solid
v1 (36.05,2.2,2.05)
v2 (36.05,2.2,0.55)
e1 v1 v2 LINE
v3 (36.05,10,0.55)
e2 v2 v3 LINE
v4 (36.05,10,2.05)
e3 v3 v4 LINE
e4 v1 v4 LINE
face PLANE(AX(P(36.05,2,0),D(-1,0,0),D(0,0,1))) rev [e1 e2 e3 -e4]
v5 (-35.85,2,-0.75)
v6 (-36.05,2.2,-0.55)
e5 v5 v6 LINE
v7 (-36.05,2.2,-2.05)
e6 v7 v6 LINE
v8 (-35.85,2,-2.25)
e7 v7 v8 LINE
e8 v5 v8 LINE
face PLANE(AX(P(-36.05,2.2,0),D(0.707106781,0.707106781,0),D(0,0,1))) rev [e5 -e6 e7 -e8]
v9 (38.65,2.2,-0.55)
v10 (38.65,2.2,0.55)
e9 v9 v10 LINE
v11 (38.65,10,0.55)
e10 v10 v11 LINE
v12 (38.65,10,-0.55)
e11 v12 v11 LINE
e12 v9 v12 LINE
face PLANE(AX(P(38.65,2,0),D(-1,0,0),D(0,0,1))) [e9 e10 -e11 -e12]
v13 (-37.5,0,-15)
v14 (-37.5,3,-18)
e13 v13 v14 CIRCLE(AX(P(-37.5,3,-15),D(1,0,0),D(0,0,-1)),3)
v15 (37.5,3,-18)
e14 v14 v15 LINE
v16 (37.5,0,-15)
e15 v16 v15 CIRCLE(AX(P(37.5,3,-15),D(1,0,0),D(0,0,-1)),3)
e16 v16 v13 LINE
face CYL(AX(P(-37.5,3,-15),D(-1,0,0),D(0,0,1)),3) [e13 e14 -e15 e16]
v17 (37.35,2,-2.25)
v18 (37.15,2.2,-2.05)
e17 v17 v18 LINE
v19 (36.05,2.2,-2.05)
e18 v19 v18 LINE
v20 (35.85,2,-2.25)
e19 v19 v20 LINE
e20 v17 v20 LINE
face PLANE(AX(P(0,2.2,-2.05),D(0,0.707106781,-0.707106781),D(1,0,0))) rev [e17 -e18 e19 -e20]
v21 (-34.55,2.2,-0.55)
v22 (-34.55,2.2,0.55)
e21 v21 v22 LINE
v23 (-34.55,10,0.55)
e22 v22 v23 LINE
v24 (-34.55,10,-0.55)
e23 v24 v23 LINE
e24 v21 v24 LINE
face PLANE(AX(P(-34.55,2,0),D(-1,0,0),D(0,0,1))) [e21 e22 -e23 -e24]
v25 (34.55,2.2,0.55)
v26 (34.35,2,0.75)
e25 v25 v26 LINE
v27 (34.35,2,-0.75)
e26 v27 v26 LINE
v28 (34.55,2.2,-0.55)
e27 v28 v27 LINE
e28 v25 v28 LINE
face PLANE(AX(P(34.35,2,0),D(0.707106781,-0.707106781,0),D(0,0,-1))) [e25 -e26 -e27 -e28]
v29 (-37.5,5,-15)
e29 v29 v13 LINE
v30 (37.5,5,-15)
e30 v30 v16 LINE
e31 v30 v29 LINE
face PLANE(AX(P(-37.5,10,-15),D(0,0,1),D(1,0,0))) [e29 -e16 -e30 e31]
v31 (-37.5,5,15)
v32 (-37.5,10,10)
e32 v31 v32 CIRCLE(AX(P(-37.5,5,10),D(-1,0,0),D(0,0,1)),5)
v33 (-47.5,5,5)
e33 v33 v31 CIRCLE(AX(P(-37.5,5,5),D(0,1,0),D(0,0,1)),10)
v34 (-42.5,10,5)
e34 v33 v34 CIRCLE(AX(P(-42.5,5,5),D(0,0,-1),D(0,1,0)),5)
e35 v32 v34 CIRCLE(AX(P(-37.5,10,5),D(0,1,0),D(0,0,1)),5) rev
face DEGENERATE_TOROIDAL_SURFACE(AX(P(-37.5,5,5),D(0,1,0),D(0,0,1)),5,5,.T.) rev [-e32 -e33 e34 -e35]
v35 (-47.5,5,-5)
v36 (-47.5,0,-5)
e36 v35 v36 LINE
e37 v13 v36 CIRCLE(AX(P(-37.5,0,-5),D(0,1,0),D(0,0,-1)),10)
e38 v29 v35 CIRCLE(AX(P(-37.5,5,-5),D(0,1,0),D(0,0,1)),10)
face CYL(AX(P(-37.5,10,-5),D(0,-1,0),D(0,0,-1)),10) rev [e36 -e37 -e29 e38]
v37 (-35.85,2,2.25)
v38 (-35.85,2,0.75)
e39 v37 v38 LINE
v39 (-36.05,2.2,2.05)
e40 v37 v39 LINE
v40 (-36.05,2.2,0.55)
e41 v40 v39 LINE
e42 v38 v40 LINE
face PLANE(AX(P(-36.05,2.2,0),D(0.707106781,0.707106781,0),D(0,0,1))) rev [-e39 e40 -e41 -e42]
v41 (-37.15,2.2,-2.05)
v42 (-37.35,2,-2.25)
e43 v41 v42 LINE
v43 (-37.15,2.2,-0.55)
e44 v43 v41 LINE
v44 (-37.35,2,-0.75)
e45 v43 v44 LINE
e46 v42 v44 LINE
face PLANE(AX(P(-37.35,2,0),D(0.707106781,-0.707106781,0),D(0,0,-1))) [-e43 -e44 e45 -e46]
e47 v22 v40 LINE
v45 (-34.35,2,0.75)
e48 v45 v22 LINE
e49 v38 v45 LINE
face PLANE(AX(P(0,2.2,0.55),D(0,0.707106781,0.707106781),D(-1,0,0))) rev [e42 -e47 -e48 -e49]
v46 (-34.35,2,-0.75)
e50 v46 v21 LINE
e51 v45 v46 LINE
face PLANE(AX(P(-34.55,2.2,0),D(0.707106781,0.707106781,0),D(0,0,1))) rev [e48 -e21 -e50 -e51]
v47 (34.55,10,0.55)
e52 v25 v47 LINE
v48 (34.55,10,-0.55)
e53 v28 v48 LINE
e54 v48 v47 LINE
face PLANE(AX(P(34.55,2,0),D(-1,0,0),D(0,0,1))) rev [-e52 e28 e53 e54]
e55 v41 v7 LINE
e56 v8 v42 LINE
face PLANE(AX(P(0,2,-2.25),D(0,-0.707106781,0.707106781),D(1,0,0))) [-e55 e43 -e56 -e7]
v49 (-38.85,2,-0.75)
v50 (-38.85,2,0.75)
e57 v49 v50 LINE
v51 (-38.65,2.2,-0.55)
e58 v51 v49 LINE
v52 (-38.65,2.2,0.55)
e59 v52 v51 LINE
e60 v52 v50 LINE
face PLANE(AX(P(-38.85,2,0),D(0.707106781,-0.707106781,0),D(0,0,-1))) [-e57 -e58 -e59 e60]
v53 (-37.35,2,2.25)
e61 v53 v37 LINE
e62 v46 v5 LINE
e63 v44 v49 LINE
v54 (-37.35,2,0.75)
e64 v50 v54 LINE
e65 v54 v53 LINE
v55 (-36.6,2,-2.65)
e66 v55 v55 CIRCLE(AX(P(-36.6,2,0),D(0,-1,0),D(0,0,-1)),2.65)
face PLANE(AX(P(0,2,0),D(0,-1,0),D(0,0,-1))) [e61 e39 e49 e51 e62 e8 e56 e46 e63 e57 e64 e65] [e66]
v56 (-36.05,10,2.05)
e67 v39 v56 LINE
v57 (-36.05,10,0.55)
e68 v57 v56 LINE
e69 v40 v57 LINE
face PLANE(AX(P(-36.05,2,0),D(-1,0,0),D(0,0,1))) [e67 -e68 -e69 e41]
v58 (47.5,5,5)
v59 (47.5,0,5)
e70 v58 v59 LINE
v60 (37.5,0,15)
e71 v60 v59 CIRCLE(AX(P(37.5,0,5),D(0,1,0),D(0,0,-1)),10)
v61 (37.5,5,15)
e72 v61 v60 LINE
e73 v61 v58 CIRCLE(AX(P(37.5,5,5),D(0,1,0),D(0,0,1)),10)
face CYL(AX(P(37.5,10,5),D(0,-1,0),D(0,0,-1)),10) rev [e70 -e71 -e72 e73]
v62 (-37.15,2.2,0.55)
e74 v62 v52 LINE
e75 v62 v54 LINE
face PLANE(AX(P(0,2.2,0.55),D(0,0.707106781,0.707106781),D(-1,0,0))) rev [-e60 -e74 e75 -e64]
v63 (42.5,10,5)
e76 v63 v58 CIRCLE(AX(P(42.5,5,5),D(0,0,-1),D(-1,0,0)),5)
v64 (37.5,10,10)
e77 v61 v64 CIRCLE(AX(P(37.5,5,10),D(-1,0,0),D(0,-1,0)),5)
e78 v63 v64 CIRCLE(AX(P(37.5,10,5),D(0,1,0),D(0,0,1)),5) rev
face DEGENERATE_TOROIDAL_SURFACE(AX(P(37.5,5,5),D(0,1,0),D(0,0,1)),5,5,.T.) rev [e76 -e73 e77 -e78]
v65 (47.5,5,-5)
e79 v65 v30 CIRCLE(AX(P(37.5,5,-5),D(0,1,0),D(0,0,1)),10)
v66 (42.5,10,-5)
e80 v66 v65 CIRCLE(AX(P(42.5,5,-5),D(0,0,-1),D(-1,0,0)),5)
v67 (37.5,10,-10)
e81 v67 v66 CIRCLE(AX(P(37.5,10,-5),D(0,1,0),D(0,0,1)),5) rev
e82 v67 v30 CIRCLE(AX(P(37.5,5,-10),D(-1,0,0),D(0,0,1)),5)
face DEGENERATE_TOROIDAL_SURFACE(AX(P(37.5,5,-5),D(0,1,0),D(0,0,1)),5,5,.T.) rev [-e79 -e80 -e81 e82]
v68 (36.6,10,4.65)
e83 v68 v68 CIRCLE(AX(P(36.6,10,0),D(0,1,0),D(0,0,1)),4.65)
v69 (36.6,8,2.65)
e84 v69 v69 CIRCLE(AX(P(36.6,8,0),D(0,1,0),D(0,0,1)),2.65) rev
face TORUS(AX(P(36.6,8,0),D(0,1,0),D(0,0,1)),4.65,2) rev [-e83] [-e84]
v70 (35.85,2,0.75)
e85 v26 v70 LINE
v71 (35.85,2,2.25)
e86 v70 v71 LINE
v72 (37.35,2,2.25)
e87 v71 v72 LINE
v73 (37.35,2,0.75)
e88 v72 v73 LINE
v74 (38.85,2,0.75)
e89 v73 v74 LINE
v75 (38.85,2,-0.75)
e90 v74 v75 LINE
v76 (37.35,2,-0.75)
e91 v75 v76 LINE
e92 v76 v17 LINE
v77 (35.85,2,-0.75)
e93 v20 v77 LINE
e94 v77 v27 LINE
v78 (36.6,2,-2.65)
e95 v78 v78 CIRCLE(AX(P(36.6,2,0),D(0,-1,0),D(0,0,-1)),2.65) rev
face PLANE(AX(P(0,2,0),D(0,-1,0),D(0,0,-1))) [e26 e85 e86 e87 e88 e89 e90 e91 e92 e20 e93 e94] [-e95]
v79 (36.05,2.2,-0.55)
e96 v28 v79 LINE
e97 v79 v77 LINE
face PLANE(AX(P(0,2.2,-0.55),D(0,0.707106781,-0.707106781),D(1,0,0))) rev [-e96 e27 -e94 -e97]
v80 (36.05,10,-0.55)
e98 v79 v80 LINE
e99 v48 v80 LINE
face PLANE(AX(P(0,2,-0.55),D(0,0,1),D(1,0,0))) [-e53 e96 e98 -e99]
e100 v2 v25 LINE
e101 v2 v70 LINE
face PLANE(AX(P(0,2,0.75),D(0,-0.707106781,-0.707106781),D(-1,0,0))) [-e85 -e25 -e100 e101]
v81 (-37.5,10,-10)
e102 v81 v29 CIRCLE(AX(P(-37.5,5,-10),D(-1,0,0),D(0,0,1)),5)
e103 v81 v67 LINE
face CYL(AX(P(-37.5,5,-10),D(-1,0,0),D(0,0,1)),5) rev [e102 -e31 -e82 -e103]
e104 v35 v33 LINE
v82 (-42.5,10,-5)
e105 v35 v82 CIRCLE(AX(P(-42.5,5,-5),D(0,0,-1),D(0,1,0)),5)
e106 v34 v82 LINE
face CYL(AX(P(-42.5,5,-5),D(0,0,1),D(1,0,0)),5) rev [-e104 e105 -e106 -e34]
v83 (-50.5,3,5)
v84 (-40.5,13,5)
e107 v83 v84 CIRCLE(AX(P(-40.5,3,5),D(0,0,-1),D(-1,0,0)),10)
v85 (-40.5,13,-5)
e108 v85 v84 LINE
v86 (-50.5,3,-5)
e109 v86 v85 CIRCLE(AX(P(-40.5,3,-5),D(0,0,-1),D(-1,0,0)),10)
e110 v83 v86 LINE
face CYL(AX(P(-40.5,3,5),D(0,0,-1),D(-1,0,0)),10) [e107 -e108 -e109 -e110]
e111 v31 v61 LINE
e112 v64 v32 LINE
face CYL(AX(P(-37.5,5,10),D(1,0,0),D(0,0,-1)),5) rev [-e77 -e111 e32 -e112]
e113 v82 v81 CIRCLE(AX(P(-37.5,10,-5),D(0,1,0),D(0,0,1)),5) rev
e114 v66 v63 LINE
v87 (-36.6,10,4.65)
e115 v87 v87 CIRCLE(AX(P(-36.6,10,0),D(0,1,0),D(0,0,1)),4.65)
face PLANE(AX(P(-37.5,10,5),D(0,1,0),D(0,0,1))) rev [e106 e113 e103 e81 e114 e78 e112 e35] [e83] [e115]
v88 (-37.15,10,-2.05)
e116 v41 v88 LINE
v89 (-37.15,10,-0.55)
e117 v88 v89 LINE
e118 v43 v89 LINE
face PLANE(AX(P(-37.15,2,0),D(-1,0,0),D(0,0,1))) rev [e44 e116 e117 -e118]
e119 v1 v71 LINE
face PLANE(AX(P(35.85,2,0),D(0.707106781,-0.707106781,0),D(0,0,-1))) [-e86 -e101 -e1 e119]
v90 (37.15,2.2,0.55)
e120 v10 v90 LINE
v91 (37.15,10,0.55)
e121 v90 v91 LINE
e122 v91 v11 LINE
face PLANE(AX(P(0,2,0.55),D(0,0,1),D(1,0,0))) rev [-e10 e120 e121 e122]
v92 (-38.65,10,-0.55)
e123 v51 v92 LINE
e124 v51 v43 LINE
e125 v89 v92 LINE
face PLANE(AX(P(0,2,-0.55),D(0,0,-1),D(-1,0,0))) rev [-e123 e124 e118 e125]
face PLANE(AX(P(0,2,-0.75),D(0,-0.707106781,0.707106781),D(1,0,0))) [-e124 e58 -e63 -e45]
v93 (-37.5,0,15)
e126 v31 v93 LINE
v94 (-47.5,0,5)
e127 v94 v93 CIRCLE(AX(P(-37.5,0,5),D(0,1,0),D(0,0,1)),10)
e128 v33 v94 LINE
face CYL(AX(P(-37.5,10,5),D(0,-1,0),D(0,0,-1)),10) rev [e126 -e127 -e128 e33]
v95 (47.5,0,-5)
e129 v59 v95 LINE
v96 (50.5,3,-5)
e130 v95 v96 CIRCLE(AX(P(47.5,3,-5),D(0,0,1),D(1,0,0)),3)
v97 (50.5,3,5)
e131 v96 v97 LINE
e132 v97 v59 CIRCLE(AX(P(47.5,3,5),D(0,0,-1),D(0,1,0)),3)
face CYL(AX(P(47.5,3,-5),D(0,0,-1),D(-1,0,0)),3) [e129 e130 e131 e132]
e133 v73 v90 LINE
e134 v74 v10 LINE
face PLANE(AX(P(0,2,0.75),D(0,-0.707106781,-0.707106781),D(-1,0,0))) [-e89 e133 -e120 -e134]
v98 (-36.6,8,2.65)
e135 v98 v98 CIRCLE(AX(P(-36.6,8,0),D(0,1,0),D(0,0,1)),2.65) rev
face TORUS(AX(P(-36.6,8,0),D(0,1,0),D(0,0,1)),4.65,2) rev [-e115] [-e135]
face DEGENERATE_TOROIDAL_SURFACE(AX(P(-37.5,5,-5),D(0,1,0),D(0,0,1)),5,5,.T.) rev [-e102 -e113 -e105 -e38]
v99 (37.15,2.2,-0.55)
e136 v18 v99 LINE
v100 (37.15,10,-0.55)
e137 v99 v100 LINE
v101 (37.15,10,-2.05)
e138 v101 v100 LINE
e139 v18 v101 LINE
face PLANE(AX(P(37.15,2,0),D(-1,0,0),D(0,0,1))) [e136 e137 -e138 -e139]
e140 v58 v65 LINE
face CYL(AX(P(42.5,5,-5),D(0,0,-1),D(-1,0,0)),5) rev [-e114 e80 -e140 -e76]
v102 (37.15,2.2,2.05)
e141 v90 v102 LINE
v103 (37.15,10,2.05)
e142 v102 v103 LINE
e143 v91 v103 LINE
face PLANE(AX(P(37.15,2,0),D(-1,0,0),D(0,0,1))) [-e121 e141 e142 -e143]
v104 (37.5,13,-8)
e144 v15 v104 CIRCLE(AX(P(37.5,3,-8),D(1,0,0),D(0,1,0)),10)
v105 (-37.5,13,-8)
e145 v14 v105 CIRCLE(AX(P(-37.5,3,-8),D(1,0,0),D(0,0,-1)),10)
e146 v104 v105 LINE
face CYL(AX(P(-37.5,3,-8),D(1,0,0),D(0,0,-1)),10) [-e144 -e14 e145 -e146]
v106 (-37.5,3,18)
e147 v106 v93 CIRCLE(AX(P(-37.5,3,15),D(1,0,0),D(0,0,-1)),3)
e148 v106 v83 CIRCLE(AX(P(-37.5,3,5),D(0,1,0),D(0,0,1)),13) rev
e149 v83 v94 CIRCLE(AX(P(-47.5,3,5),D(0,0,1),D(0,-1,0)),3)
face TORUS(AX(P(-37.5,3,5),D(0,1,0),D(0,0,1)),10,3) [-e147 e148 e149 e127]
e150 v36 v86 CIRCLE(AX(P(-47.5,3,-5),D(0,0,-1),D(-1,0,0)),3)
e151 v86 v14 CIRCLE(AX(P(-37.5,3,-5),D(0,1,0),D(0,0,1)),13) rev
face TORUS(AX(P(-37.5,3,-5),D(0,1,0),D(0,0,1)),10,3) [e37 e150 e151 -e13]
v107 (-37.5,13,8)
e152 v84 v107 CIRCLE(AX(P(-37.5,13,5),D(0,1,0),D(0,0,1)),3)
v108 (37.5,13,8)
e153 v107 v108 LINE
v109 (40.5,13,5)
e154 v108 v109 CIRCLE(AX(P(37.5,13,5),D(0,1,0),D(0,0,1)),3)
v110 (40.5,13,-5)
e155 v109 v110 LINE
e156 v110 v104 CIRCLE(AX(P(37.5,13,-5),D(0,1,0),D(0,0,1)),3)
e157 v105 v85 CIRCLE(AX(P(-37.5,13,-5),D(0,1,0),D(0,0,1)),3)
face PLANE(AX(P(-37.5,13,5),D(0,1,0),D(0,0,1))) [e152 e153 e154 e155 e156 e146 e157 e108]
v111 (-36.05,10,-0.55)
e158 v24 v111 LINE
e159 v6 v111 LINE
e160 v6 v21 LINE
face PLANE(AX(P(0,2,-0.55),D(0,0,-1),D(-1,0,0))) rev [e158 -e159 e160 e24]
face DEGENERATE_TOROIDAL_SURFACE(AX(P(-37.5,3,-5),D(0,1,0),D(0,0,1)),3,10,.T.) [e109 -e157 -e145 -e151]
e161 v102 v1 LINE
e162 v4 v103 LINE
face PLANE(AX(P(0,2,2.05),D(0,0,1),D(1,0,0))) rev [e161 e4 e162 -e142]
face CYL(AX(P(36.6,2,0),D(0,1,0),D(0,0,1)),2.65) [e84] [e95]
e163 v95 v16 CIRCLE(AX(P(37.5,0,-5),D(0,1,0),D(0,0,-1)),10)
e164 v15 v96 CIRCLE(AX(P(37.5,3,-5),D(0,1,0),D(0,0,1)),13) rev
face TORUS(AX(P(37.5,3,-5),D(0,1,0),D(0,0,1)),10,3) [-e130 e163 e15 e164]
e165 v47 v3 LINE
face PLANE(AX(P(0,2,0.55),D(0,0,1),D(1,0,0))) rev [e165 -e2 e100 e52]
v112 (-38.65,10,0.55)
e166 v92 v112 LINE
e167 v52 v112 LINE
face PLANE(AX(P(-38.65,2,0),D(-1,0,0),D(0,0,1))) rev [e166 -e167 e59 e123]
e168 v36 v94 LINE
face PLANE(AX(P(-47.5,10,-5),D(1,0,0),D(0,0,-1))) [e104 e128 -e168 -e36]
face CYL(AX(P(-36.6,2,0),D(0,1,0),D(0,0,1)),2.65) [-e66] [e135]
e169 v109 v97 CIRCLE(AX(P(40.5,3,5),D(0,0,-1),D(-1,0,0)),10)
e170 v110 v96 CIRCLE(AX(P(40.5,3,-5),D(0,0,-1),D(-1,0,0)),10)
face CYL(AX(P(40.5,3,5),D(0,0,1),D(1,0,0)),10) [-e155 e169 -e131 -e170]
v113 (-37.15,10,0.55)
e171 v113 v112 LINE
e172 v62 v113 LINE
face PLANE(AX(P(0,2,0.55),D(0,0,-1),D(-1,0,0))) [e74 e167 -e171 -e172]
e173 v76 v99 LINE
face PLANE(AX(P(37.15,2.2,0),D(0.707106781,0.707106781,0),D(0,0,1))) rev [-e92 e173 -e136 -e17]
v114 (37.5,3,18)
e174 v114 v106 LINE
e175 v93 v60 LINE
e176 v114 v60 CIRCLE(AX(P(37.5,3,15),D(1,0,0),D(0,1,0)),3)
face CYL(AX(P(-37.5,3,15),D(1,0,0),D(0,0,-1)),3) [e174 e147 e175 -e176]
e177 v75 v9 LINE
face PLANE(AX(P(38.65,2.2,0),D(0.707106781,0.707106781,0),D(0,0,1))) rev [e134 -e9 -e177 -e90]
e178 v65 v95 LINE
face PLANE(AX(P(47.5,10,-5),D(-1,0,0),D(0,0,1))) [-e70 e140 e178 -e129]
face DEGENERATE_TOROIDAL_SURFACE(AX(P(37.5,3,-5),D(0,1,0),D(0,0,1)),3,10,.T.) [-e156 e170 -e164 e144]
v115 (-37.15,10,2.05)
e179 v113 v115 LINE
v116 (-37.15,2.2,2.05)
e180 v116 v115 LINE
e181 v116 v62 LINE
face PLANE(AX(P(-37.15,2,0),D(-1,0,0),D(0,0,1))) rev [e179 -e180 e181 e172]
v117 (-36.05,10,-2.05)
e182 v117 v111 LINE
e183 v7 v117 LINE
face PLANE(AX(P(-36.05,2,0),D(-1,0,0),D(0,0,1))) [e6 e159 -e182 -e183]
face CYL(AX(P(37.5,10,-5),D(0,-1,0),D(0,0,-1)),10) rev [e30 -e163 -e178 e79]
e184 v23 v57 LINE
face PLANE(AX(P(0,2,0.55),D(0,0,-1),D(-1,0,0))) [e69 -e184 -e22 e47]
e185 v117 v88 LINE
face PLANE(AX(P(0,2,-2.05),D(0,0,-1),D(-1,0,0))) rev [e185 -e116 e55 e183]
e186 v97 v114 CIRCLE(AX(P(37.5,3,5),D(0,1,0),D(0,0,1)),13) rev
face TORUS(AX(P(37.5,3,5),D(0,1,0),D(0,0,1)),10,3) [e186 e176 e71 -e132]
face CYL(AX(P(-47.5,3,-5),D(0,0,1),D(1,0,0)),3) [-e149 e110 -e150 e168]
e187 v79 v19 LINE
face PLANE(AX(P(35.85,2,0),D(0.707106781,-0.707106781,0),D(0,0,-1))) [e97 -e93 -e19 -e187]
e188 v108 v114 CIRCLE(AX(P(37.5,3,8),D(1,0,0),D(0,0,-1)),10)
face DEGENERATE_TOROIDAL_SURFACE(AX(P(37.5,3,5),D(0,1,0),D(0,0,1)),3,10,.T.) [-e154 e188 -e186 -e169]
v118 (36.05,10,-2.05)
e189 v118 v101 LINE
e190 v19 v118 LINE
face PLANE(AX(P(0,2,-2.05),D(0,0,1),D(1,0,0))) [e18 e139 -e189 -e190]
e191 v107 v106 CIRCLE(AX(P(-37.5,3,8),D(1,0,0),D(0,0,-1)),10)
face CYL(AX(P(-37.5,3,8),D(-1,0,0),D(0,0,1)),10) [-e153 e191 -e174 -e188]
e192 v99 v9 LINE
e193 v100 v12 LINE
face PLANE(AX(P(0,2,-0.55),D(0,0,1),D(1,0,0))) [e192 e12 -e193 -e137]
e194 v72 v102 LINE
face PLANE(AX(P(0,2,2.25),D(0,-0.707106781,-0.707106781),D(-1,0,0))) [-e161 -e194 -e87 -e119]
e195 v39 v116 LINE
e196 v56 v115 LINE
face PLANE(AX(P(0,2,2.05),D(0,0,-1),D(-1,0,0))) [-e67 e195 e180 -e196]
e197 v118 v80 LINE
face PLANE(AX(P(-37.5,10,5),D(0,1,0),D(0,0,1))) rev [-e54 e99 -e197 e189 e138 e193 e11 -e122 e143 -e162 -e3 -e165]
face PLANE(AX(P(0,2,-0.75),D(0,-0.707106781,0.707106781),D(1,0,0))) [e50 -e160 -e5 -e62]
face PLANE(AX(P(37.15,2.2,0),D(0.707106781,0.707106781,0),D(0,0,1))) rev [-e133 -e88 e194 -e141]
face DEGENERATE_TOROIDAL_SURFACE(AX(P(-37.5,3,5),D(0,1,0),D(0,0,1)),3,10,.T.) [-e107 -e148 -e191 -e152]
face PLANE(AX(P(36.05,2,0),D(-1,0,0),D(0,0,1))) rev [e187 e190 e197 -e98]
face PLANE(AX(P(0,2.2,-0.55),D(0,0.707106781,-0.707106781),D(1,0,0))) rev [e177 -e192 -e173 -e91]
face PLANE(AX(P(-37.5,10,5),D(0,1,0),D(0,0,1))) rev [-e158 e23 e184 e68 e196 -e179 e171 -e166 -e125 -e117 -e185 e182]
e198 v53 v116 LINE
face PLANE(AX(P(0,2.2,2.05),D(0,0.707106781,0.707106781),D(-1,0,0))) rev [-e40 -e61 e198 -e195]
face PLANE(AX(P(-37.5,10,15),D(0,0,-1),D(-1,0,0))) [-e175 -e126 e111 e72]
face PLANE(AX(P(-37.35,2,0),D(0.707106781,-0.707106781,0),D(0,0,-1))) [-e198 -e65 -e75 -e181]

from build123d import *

# Parameters (mm, degrees)
EXTRUDE_1_DEPTH = 10
SHELL_2_T       = 3
FILLET_3_R      = 10
FILLET_4_R      = 3
SKETCH_2_R      = 2.65
EXTRUDE_2_DEPTH = 8
FILLET_7_R      = 5
CHAMFER_1_SIZE  = 0.2
CHAMFER_2_SIZE  = 0.2
FILLET_9_R      = 2
FILLET_10_R     = 2


# Some blends are built 0.0001 mm under size
with BuildPart() as part:
    # 草图1 → 凸台-拉伸1 (new body)
    with BuildSketch(Plane(origin=(0, 0, 0), x_dir=(1, 0, 0), z_dir=(0, 1, 0))):
        with BuildLine():
            Line((-37.5, 15), (37.5, 15))
            ThreePointArc((37.5, 15), (44.571067812, 12.071067812), (47.5, 5))
            Line((47.5, 5), (47.5, -5))
            ThreePointArc((47.5, -5), (44.571067812, -12.071067812), (37.5, -15))
            Line((37.5, -15), (-37.5, -15))
            ThreePointArc((-37.5, -15), (-44.571067812, -12.071067812), (-47.5, -5))
            Line((-47.5, -5), (-47.5, 5))
            ThreePointArc((-47.5, 5), (-44.571067812, 12.071067812), (-37.5, 15))
        make_face()
    extrude(amount=EXTRUDE_1_DEPTH)

    # 抽壳2
    shell_2_openings = [part.faces().sort_by_distance(p)[0] for p in [
        (0, 0, 0),
    ]]
    offset(amount=SHELL_2_T, openings=shell_2_openings, kind=Kind.INTERSECTION)

    # 圆角3
    # the kernel refuses this fillet: 10 mm, written as the material it takes off along each edge
    with BuildSketch(Plane(origin=(37.5, 13, 5), x_dir=(1, 0, 0), z_dir=(0, 0, -1))) as fillet_3_piece_1:
        with BuildLine():
            CenterArc((13 - FILLET_3_R, FILLET_3_R), FILLET_3_R, 270, 90)
            Line((13 - FILLET_3_R, 0), (13, 0))
            Line((13, 0), (13, FILLET_3_R))
        make_face()
    revolve(axis=Axis((37.5, 13, 5), (0, -1, 0)), revolution_arc=90, mode=Mode.SUBTRACT)
    with BuildSketch(Plane(origin=(50.5, 13, 5), x_dir=(0, -1, 0), z_dir=(0, 0, -1)), Plane(origin=(-50.5, 13, -5), x_dir=(0, -1, 0), z_dir=(0, 0, 1))) as fillet_3_piece_2:
        with BuildLine():
            CenterArc((FILLET_3_R, FILLET_3_R), FILLET_3_R, 180, 90)
            Line((0, FILLET_3_R), (0, 0))
            Line((0, 0), (FILLET_3_R, 0))
        make_face()
    extrude(amount=10, mode=Mode.SUBTRACT)
    with BuildSketch(Plane(origin=(37.5, 13, -5), x_dir=(0, 0, -1), z_dir=(-1, 0, 0))) as fillet_3_piece_3:
        with BuildLine():
            CenterArc((13 - FILLET_3_R, FILLET_3_R), FILLET_3_R, 270, 90)
            Line((13 - FILLET_3_R, 0), (13, 0))
            Line((13, 0), (13, FILLET_3_R))
        make_face()
    revolve(axis=Axis((37.5, 13, -5), (0, -1, 0)), revolution_arc=90, mode=Mode.SUBTRACT)
    with BuildSketch(Plane(origin=(37.5, 13, -18), x_dir=(0, -1, 0), z_dir=(-1, 0, 0)), Plane(origin=(-37.5, 13, 18), x_dir=(0, -1, 0), z_dir=(1, 0, 0))) as fillet_3_piece_4:
        with BuildLine():
            CenterArc((FILLET_3_R, FILLET_3_R), FILLET_3_R, 180, 90)
            Line((0, FILLET_3_R), (0, 0))
            Line((0, 0), (FILLET_3_R, 0))
        make_face()
    extrude(amount=75, mode=Mode.SUBTRACT)
    with BuildSketch(Plane(origin=(-37.5, 13, -5), x_dir=(-1, 0, 0), z_dir=(0, 0, 1))) as fillet_3_piece_5:
        with BuildLine():
            CenterArc((13 - FILLET_3_R, FILLET_3_R), FILLET_3_R, 270, 90)
            Line((13 - FILLET_3_R, 0), (13, 0))
            Line((13, 0), (13, FILLET_3_R))
        make_face()
    revolve(axis=Axis((-37.5, 13, -5), (0, -1, 0)), revolution_arc=90, mode=Mode.SUBTRACT)
    with BuildSketch(Plane(origin=(-37.5, 13, 5), x_dir=(0, 0, 1), z_dir=(1, 0, 0))) as fillet_3_piece_6:
        with BuildLine():
            CenterArc((13 - FILLET_3_R, FILLET_3_R), FILLET_3_R, 270, 90)
            Line((13 - FILLET_3_R, 0), (13, 0))
            Line((13, 0), (13, FILLET_3_R))
        make_face()
    revolve(axis=Axis((-37.5, 13, 5), (0, -1, 0)), revolution_arc=90, mode=Mode.SUBTRACT)

    # 圆角4
    fillet_4_edges = [part.edges().sort_by_distance(p)[0] for p in [
        (50.5, 0, 0),
        (46.692388155, 0, 14.192388155),
        (0, 0, 18),
        (-46.692388155, 0, 14.192388155),
        (-50.5, 0, 0),
        (-46.692388155, 0, -14.192388155),
        (0, 0, -18),
        (46.692388155, 0, -14.192388155),
    ]]
    fillet(fillet_4_edges, radius=FILLET_4_R - 0.0001)  # a hair under: the kernel refuses the full size

    # 草图2 → 凸台-拉伸2 (add)
    # profile 1 of 2: a face of its own
    with BuildSketch(Plane(origin=(0, 10, 0), x_dir=(-1, 0, 0), z_dir=(0, -1, 0))):
        with Locations(Location((36.6, 0, 0), (0, 0, 270))):
            Circle(SKETCH_2_R)
        Polygon((34.55, -0.55), (34.55, 0.55), (36.05, 0.55), (36.05, 2.05), (37.15, 2.05), (37.15, 0.55), (38.65, 0.55), (38.65, -0.55), (37.15, -0.55), (37.15, -2.05), (36.05, -2.05), (36.05, -0.55), align=None, mode=Mode.SUBTRACT)
    # profile 2 of 2: a face of its own
    with BuildSketch(Plane(origin=(0, 10, 0), x_dir=(-1, 0, 0), z_dir=(0, -1, 0))):
        with Locations(Location((-36.6, 0, 0), (0, 0, 90))):
            Circle(SKETCH_2_R)
        Polygon((-37.15, 0.55), (-37.15, 2.05), (-36.05, 2.05), (-36.05, 0.55), (-34.55, 0.55), (-34.55, -0.55), (-36.05, -0.55), (-36.05, -2.05), (-37.15, -2.05), (-37.15, -0.55), (-38.65, -0.55), (-38.65, 0.55), align=None, mode=Mode.SUBTRACT)
    extrude(amount=EXTRUDE_2_DEPTH)

    # 圆角7
    fillet_7_edges = [part.edges().sort_by_distance(p)[0] for p in [
        (-44.571067812, 10, 12.071067812),
        (0, 10, 15),
        (44.571067812, 10, 12.071067812),
        (47.5, 10, 0),
        (44.571067812, 10, -12.071067812),
        (0, 10, -15),
        (-44.571067812, 10, -12.071067812),
        (-47.5, 10, 0),
    ]]
    fillet(fillet_7_edges, radius=FILLET_7_R)

    # 倒角1
    chamfer_1_edges = [part.edges().sort_by_distance(p)[0] for p in [
        (35.3, 2, -0.55),
        (37.15, 2, 1.3),
        (38.65, 2, 0),
        (37.9, 2, -0.55),
        (37.15, 2, -1.3),
        (36.6, 2, -2.05),
        (34.55, 2, 0),
        (35.3, 2, 0.55),
        (36.05, 2, 1.3),
        (36.6, 2, 2.05),
        (37.9, 2, 0.55),
        (36.05, 2, -1.3),
    ]]
    chamfer(chamfer_1_edges, length=CHAMFER_1_SIZE)

    # 倒角2
    chamfer_2_edges = [part.edges().sort_by_distance(p)[0] for p in [
        (-36.6, 2, -2.05),
        (-37.15, 2, -1.3),
        (-37.9, 2, -0.55),
        (-38.65, 2, 0),
        (-37.15, 2, 1.3),
        (-35.3, 2, -0.55),
        (-37.9, 2, 0.55),
        (-36.6, 2, 2.05),
        (-36.05, 2, 1.3),
        (-35.3, 2, 0.55),
        (-34.55, 2, 0),
        (-36.05, 2, -1.3),
    ]]
    chamfer(chamfer_2_edges, length=CHAMFER_2_SIZE)

    # 圆角9
    fillet_9_edges = [part.edges().sort_by_distance(p)[0] for p in [
        (36.6, 10, 2.65),
    ]]
    fillet(fillet_9_edges, radius=FILLET_9_R)

    # 圆角10
    fillet_10_edges = [part.edges().sort_by_distance(p)[0] for p in [
        (-36.6, 10, -2.65),
    ]]
    fillet(fillet_10_edges, radius=FILLET_10_R)


solid = part.part
